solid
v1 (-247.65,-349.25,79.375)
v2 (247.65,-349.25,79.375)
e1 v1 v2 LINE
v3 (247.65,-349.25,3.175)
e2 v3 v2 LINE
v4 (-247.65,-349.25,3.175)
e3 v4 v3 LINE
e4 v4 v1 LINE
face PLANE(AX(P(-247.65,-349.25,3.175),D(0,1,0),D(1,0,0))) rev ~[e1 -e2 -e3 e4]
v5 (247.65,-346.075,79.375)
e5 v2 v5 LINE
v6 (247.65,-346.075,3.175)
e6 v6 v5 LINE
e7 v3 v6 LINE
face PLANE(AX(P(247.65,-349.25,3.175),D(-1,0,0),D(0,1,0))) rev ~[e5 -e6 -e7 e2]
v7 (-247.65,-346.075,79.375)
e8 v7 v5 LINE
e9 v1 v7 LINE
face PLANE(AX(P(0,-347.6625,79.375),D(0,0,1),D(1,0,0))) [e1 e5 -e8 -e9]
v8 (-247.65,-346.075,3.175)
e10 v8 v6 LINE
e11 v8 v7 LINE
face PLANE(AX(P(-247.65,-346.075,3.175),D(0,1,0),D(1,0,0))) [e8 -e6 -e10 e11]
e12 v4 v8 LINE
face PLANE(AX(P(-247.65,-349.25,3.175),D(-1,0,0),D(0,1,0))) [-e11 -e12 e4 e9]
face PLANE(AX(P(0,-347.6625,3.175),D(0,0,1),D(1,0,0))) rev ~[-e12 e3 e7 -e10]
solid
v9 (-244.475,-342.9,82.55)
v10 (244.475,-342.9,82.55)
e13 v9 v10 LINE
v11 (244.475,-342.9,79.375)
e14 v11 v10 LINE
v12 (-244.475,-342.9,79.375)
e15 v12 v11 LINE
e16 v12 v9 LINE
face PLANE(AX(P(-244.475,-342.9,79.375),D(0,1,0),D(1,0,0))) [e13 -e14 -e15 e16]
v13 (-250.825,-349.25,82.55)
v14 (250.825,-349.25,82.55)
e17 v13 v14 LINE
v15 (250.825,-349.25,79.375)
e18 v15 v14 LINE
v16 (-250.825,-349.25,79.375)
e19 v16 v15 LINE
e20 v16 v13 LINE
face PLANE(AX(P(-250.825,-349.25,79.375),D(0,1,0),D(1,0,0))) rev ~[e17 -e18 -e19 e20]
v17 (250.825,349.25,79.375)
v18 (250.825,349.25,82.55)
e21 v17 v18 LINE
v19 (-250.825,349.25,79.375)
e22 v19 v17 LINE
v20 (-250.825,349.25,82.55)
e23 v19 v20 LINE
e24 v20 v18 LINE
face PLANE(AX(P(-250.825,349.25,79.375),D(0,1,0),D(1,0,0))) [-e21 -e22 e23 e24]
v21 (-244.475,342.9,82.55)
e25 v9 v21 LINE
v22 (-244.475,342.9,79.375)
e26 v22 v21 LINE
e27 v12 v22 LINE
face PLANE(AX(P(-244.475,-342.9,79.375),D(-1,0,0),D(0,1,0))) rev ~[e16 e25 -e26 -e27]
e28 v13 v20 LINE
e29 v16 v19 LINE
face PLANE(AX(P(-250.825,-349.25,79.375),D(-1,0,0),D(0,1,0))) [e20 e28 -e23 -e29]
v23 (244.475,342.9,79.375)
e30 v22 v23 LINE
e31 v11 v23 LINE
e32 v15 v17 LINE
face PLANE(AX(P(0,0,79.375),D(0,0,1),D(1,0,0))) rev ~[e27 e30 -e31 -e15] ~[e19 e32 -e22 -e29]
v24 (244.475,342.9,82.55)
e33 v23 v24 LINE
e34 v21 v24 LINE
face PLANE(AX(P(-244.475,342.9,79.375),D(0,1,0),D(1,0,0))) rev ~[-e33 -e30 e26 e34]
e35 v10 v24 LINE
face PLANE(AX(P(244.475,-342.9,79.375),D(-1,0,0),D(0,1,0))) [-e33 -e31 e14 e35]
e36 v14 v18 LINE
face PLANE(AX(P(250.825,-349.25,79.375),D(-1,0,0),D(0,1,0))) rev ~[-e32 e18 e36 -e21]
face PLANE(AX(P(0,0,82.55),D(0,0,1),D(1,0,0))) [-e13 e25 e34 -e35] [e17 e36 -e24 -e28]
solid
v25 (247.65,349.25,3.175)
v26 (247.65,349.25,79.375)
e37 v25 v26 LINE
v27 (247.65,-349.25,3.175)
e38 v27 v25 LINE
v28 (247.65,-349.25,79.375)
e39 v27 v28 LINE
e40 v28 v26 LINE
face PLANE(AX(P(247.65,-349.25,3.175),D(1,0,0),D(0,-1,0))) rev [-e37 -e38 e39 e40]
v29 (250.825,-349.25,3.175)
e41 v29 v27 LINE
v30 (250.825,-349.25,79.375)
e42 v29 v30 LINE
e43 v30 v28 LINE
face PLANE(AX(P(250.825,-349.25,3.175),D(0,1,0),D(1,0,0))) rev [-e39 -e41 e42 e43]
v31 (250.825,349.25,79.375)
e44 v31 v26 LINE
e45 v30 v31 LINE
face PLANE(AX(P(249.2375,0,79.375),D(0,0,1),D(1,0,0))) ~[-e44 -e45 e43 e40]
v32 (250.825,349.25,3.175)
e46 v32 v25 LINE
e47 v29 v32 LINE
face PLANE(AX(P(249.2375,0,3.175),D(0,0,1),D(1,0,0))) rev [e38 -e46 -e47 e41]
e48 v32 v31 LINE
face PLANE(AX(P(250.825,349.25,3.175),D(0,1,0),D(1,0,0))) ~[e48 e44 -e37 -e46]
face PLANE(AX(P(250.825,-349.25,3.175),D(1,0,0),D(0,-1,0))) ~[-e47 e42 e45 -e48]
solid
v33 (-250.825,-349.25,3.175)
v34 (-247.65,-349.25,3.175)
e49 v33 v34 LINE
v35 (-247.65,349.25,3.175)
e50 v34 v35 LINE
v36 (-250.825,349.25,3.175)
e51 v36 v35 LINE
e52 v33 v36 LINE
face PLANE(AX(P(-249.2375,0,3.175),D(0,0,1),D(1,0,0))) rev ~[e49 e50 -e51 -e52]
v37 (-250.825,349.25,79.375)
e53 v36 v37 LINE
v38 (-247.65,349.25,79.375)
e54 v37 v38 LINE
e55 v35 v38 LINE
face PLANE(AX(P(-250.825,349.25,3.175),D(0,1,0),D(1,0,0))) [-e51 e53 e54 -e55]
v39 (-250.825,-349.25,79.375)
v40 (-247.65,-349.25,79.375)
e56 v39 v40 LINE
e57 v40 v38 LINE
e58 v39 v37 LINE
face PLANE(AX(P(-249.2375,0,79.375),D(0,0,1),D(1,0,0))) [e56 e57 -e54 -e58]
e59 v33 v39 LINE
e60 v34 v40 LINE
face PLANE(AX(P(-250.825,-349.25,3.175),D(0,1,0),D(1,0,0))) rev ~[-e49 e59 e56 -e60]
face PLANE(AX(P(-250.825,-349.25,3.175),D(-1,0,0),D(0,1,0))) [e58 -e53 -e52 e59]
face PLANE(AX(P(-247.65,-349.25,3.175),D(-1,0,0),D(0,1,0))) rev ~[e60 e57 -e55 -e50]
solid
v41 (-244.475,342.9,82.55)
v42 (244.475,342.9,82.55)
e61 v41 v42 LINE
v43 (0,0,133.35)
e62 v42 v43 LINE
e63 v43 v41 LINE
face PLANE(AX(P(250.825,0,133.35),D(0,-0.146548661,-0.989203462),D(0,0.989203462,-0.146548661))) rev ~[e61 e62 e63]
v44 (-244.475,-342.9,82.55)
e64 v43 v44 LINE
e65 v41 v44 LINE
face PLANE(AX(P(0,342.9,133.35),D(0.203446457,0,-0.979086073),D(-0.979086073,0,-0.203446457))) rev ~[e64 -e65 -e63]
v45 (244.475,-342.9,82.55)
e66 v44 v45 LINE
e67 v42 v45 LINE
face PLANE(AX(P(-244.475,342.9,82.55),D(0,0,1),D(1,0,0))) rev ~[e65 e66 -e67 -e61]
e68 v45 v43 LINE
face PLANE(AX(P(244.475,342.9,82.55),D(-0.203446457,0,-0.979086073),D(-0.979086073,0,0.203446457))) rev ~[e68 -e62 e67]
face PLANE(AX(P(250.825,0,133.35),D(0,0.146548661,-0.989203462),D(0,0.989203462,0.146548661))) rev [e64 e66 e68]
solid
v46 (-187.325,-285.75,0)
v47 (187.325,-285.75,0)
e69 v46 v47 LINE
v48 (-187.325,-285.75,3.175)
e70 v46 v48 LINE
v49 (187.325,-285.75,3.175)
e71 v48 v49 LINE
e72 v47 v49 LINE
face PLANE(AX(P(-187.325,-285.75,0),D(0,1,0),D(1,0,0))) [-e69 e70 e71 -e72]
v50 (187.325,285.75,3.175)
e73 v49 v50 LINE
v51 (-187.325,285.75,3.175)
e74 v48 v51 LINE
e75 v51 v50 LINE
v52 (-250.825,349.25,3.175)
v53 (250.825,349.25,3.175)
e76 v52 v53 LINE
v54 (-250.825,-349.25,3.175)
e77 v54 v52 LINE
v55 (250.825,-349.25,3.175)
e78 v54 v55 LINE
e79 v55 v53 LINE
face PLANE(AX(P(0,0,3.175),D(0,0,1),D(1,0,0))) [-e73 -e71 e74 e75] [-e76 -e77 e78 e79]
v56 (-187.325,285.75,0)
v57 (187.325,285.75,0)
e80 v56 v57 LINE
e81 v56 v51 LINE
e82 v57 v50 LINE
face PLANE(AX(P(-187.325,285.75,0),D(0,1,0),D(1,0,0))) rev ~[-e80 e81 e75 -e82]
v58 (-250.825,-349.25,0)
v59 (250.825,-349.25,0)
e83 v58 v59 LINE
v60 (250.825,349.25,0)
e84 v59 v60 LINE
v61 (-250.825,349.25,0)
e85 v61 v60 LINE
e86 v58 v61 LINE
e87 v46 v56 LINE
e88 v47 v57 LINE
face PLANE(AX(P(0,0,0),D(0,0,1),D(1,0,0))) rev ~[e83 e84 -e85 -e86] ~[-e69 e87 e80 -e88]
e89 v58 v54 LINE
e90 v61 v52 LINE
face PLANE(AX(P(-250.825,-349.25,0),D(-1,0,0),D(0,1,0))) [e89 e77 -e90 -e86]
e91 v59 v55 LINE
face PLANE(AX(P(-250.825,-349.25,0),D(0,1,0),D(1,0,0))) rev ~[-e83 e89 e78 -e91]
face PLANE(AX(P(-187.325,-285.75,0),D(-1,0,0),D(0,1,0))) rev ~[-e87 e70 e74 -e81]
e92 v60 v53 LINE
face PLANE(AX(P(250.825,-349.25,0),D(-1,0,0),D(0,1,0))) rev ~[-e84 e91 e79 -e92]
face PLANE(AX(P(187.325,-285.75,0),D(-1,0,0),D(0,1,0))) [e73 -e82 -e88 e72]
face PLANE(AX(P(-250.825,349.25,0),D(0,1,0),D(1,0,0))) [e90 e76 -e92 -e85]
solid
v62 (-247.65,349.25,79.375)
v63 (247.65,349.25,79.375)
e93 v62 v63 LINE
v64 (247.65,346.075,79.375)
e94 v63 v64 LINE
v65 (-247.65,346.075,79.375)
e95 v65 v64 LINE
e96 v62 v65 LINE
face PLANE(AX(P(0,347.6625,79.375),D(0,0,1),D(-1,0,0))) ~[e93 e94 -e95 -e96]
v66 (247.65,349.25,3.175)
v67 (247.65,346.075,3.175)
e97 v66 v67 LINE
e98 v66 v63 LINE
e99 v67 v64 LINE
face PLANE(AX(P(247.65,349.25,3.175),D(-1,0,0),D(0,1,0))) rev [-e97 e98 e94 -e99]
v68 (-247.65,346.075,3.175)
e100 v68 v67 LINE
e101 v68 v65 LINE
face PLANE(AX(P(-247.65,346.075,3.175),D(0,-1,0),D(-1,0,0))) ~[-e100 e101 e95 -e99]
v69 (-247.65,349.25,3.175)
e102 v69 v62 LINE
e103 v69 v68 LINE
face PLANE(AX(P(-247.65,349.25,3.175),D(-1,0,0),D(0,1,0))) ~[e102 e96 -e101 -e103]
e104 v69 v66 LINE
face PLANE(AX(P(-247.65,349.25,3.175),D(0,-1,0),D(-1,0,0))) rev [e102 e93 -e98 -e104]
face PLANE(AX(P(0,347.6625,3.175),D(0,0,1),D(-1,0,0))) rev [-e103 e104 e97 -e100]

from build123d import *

# Parameters (mm, degrees)
F0_W      = 501.65
F0_H      = 698.5
F0_W_2    = 450.85
F0_H_2    = 647.7
F0_W_3    = 374.65
F0_H_3    = 571.5
F1_DEPTH  = 3.175
F2_W      = 3.175
F2_H      = 698.5
F3_DEPTH  = 76.2
F5_W      = 495.3
F5_H      = 3.175
F6_DEPTH  = 76.2
F8_W      = 501.65
F8_H      = 698.5
F8_W_2    = 488.95
F8_H_2    = 685.8
F9_DEPTH  = 3.175
F11_DEPTH = 685.8
F13_DEPTH = 501.651


# Not quite as in the source:
# - a pattern or mirror of a feature is missing from the dataset's text; its kind, count and spacing are read off the source's solid
# - a feature names something its author has since deleted; it is built from what else it names


with BuildPart() as f1:
    # F0 (on Top) → F1 (new body)
    with BuildSketch(Plane.XY):
        Rectangle(F0_W, F0_H)
        Rectangle(F0_W_2, F0_H_2, mode=Mode.SUBTRACT)
        Rectangle(F0_W_2, F0_H_2)
        Rectangle(F0_W_3, F0_H_3, mode=Mode.SUBTRACT)
    extrude(amount=F1_DEPTH)


with BuildPart() as f3:
    # F2 (on face) → F3 (new body)
    with BuildSketch(Plane.XY.offset(3.175)):
        with Locations((-249.2375, 0)):
            Rectangle(F2_W, F2_H)
    extrude(amount=F3_DEPTH)


with BuildPart() as f4_1:
    # F4: instance of F3
    add(f3.part.mirror(Plane.YZ))


with BuildPart() as f6:
    # F5 (on face) → F6 (new body, through all)
    with BuildSketch(Plane.XY.offset(3.175)):
        with Locations((0, -347.6625)):
            Rectangle(F5_W, F5_H)
    extrude(amount=F6_DEPTH)


with BuildPart() as f7_1:
    # F7: instance of F6
    add(f6.part.mirror(Plane.XZ))


with BuildPart() as f9:
    # F8 (on face) → F9 (new body)
    with BuildSketch(Plane.XY.offset(79.375)):
        Rectangle(F8_W, F8_H)
        Rectangle(F8_W_2, F8_H_2, mode=Mode.SUBTRACT)
    extrude(amount=F9_DEPTH)


with BuildPart() as f11:
    # F10 (on face) → F11 (new body, through all)
    with BuildSketch(Plane.XZ.offset(-342.9)):
        Polygon((0, 133.35), (-244.475, 82.55), (0, 82.55), align=None)
        Polygon((244.475, 82.55), (0, 133.35), (0, 82.55), align=None)
    extrude(amount=F11_DEPTH)

    # F12 (on face) → F13 (cut, through all)
    with BuildSketch(Plane.YZ.offset(250.825)):
        Polygon((0, 133.35), (342.9, 82.55), (342.9, 133.35), align=None)
    f13 = extrude(amount=-F13_DEPTH, mode=Mode.SUBTRACT)

    # F13_copies: F13 across plane
    add(f13.mirror(Plane(origin=(0, 0, 0), x_dir=(0, 0, -1), z_dir=(0, -1, 0))), mode=Mode.SUBTRACT)


solid = Compound([f1.part, f3.part, f4_1.part, f6.part, f7_1.part, f9.part, f11.part])
